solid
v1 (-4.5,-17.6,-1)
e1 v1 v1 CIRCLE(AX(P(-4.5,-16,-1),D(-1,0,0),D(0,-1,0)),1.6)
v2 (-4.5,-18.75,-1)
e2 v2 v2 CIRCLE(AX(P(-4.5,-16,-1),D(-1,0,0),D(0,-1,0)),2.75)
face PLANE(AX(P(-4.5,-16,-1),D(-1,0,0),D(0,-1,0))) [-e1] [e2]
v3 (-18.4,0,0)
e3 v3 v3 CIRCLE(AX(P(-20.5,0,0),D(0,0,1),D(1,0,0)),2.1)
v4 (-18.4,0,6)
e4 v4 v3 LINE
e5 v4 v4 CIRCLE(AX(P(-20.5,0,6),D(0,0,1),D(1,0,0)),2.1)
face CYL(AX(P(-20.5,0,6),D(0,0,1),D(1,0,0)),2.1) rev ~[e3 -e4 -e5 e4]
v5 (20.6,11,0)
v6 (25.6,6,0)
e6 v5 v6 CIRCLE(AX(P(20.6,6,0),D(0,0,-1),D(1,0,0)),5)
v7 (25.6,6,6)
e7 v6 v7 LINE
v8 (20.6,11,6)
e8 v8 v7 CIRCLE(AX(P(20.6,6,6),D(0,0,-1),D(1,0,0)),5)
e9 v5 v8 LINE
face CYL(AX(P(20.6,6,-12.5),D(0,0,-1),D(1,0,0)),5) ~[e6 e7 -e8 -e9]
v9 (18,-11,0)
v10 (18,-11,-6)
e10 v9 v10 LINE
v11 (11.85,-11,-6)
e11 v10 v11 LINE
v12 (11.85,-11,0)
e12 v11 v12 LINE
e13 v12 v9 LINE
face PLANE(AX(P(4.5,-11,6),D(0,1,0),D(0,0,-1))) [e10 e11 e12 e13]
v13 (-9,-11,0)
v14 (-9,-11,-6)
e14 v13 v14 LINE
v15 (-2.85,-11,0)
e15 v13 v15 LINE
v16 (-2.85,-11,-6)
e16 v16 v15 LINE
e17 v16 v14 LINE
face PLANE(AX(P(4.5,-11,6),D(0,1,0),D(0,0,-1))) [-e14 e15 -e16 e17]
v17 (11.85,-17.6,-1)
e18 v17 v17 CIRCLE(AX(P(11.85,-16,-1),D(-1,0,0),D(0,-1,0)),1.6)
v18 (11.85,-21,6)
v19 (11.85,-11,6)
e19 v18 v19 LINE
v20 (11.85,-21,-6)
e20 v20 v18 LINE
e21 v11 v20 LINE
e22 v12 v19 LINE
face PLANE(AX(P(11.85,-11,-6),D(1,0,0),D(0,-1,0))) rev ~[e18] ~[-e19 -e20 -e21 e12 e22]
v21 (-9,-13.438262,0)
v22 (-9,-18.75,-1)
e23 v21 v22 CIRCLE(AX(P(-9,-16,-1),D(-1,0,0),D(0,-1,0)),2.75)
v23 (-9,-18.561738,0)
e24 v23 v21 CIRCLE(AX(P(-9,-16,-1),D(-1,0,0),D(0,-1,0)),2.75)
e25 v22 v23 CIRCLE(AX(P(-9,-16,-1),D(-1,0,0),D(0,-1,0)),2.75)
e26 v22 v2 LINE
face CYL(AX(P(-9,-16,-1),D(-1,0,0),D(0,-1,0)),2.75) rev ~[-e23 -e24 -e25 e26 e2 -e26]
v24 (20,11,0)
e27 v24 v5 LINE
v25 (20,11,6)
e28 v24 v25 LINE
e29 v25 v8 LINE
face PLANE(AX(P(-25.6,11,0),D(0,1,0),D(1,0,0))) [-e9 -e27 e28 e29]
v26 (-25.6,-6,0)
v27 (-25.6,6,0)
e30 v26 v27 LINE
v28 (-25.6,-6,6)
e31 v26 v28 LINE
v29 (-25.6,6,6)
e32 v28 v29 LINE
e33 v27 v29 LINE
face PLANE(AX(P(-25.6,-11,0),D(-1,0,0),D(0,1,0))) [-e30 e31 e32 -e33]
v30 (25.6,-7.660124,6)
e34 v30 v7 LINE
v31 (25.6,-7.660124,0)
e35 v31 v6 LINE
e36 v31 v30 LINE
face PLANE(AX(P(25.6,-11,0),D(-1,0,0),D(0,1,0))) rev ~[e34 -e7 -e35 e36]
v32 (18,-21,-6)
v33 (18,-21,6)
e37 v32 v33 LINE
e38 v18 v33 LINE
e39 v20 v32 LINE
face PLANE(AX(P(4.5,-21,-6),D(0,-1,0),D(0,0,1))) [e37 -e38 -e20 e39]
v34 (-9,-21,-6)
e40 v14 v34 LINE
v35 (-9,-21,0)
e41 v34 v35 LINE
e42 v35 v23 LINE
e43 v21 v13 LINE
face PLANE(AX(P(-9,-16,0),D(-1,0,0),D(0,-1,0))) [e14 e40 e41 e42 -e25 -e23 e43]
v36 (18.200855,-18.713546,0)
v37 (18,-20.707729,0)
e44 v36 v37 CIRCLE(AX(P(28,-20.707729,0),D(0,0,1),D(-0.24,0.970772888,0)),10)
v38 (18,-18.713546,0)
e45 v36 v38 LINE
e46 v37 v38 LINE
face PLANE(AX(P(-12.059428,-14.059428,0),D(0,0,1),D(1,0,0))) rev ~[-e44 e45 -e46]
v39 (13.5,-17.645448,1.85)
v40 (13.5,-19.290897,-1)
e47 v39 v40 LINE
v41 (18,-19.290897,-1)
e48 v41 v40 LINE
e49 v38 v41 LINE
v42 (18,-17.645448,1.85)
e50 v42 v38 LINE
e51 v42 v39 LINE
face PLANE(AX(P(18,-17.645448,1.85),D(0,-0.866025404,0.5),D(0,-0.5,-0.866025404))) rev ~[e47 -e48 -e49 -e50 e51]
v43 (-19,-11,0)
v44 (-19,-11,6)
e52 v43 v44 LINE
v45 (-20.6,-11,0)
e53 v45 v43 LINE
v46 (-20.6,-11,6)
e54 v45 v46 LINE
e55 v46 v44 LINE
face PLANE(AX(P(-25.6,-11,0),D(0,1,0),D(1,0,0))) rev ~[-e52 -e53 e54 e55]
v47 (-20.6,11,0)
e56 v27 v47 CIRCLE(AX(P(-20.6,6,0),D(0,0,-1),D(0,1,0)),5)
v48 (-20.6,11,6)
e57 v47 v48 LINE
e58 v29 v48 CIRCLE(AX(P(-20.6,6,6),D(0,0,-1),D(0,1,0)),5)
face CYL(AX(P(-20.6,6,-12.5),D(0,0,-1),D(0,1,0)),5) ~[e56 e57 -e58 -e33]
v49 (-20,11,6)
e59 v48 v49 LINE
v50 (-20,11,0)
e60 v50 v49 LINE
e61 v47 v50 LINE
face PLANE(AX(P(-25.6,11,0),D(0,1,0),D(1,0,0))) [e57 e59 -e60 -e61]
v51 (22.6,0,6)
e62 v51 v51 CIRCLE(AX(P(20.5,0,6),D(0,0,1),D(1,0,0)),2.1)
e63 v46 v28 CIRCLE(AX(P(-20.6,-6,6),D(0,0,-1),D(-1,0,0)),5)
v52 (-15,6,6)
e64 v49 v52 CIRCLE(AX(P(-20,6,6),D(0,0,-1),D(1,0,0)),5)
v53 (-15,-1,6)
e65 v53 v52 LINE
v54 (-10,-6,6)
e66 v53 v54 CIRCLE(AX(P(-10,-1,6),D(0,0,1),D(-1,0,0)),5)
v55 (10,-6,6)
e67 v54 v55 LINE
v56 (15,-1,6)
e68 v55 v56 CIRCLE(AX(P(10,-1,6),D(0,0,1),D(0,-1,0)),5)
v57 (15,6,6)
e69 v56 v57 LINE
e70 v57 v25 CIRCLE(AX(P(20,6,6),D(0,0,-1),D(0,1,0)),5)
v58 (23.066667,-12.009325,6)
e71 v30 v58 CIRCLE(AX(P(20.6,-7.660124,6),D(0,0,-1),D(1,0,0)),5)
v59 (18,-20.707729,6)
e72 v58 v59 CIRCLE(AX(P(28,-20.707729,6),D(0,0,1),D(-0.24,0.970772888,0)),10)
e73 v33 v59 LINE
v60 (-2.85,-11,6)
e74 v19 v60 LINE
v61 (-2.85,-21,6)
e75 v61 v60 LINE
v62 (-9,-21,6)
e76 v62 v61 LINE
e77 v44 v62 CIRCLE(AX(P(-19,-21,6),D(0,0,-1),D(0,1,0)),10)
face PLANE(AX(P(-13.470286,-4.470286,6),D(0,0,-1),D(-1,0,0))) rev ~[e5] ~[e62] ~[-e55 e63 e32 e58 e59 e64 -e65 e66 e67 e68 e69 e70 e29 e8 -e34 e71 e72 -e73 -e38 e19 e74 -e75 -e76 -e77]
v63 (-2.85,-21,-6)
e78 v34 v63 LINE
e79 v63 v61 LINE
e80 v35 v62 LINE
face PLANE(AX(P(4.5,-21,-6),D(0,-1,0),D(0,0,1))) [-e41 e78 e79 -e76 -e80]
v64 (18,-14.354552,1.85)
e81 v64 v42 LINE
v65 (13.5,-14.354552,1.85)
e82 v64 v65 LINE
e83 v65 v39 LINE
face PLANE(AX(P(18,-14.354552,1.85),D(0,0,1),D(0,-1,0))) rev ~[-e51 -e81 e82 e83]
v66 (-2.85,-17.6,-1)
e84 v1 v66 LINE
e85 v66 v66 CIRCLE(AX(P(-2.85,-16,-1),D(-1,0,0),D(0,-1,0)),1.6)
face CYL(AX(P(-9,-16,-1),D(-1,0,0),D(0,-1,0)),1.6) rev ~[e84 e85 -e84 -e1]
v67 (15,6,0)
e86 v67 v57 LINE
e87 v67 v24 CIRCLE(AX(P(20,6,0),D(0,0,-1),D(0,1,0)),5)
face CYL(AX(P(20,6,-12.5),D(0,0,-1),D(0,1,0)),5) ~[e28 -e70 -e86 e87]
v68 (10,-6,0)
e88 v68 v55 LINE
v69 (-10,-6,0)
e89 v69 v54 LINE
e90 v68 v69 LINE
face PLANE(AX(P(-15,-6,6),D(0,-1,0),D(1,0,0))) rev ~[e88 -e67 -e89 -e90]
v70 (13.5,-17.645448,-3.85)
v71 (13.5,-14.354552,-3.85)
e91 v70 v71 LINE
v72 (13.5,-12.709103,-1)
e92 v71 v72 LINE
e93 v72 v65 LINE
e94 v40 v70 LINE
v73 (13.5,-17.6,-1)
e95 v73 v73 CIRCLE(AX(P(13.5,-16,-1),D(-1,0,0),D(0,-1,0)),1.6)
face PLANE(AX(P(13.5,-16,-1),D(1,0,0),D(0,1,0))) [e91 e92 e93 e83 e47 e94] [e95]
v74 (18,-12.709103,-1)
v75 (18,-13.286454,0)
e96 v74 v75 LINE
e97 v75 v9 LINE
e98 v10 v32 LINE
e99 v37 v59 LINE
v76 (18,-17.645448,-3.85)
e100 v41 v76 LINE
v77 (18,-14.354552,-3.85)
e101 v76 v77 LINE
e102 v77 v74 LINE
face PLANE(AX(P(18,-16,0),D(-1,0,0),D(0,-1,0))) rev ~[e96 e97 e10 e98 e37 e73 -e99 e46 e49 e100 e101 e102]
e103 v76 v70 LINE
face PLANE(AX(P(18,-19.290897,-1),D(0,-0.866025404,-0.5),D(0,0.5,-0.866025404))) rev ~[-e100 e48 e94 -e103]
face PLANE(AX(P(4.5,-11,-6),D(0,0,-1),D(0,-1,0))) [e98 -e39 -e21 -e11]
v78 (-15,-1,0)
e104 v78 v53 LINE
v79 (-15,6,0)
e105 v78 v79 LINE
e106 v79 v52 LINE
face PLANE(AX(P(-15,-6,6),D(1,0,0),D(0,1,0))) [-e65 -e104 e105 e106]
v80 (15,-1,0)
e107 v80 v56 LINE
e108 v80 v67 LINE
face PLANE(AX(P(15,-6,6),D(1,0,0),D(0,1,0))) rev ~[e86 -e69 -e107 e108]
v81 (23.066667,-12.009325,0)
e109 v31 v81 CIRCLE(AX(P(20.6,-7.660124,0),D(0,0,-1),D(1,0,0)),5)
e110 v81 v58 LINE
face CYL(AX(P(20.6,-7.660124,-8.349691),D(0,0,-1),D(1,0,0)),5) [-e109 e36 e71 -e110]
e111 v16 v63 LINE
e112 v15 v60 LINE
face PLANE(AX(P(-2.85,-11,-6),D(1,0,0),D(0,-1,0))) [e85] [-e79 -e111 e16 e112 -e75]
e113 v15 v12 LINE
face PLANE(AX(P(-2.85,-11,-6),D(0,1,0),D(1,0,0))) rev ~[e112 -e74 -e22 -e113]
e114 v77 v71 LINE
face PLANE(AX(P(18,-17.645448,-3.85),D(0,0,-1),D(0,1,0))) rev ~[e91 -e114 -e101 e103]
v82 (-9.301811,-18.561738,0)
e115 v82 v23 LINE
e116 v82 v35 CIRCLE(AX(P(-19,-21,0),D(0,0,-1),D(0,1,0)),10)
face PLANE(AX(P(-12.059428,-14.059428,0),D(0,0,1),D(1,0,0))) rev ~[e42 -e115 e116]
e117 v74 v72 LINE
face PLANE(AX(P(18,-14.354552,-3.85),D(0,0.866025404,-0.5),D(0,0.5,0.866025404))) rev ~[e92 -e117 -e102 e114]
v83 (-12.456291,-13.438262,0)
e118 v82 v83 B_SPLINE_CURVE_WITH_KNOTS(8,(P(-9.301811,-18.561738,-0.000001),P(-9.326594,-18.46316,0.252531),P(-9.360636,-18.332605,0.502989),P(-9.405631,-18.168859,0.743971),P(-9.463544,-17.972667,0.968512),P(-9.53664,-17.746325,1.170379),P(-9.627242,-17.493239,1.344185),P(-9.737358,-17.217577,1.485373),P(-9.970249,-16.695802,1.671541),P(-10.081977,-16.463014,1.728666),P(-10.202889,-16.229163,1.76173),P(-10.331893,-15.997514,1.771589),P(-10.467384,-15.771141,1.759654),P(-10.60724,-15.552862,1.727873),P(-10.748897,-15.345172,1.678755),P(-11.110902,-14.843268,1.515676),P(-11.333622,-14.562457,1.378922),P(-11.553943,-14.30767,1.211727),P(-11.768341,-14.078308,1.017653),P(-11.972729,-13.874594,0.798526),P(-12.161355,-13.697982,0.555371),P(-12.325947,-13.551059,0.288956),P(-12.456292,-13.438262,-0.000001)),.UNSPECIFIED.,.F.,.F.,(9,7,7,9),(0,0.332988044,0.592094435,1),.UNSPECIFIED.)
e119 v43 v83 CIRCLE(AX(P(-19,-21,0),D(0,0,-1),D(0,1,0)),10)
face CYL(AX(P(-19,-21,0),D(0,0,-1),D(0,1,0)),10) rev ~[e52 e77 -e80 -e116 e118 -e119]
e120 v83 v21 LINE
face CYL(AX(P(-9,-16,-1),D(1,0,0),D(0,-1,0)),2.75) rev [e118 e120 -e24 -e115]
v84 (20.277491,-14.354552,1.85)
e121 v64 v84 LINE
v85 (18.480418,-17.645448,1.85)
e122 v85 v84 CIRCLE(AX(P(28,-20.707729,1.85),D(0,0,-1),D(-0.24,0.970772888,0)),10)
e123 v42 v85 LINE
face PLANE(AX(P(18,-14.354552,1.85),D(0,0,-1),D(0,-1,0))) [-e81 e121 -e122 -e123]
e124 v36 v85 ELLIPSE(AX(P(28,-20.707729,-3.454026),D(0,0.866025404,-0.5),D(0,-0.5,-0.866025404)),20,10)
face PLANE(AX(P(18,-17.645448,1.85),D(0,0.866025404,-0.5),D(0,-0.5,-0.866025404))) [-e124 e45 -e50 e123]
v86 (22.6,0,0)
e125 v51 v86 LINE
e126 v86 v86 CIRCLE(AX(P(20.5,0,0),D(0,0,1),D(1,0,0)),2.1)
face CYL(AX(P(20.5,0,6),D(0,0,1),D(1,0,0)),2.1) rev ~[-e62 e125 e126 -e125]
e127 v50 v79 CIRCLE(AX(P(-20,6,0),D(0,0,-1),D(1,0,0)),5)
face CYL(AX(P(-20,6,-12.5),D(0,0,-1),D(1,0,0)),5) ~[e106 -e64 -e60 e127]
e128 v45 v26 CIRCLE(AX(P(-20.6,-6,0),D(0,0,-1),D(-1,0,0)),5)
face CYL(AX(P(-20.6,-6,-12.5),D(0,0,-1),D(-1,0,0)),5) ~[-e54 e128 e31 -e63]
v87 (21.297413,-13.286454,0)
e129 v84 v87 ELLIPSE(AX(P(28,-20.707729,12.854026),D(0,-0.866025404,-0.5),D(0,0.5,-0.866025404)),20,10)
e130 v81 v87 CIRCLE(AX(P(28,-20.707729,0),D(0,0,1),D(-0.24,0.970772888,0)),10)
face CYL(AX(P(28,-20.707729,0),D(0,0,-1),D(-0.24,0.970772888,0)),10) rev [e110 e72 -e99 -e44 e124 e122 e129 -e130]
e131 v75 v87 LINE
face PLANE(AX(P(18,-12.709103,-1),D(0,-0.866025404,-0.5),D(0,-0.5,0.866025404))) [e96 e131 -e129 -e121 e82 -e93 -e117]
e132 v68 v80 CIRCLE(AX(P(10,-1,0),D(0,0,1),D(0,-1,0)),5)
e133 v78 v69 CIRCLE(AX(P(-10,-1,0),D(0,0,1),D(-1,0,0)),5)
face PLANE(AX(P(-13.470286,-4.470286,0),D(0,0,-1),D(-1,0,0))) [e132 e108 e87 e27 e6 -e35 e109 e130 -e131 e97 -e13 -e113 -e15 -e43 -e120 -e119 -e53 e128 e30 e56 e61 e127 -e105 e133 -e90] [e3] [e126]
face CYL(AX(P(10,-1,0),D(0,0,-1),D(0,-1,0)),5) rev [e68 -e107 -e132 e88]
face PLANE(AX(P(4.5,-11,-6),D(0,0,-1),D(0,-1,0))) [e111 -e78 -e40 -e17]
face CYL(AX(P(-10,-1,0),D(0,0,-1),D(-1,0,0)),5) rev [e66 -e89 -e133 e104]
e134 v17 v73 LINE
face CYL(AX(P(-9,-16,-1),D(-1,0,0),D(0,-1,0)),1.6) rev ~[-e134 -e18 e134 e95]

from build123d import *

# Parameters (mm, degrees)
F0_W           = 51.2
F0_H           = 22
F1_DEPTH       = 6
F2_R           = 2.1
F3_DEPTH       = 6.001
F5_DEPTH       = 6.001
F8_DEPTH       = 13.5
F9_W           = 14.7
F9_H           = 10
F10_DEPTH      = 12.001
F11_T1_DEPTH   = 6
F12_R          = 1.6
F13_DEPTH      = 34.601
F13_DEPTH_BACK = 16.601
F14_R          = 2.75
F15_DEPTH      = 4.5
F15_DEPTH_BACK = 16.601
F17_DEPTH      = 4.5
F17_DEPTH_BACK = 25
F18_W          = 30
F18_H          = 17
F19_DEPTH      = 12.001
F20_T1_DEPTH   = 6
F20_T3_DEPTH   = 31
F20_T5_DEPTH   = 22.6993813232


# Not quite as in the source:
# - a fillet or chamfer that OpenCascade refuses, or shapes differently, is made with other operations: its cross-section is extruded or revolved along the edge and cut away or added


with BuildPart() as f1:
    # F0 (on Top) → F1 (new body)
    with BuildSketch(Plane.XY):
        Rectangle(F0_W, F0_H)
    extrude(amount=F1_DEPTH)

    # F2 (on face) → F3 (cut, through all)
    with BuildSketch(Plane.XY.offset(6)):
        with Locations((-20.5, 0)):
            Circle(F2_R)
        with Locations((20.5, 0)):
            Circle(F2_R)
    extrude(amount=-F3_DEPTH, mode=Mode.SUBTRACT)

    # F4 (on face) → F5 (cut, through all)
    with BuildSketch(Plane.XY.offset(6)):
        with BuildLine():
            Line((-1.5, 11), (-1.5, 0))
            ThreePointArc((-1.5, 0), (4.5, -6), (10.5, 0))
            Line((10.5, 0), (10.5, 11))
            Line((10.5, 11), (-1.5, 11))
        make_face()
    extrude(amount=-F5_DEPTH, mode=Mode.SUBTRACT)

    # F7 (on mid) → F8 (join, symmetric)
    with BuildSketch(Plane(origin=(4.5, 0, 0), x_dir=(0, -1, 0), z_dir=(-1, 0, 0))):
        Polygon((21, 6), (11, 6), (11, 0), (11, -6), (21, -6), align=None)
    extrude(amount=F8_DEPTH, both=True)

    # F9 (on face) → F10 (cut, through all)
    with BuildSketch(Plane(origin=(0, 0, -6), x_dir=(1, 0, 0), z_dir=(0, 0, -1))):
        with Locations((4.5, 16)):
            Rectangle(F9_W, F9_H)
    extrude(amount=-F10_DEPTH, mode=Mode.SUBTRACT)

    # F11: fillet of radius 10 on 2 edges, made by hand

    # F11_s2 → F11_t1 (join)
    with BuildSketch(Plane.XY):
        with BuildLine():
            ThreePointArc((-19, -11), (-11.9289321881, -13.9289321881), (-9, -21))
            Line((-9, -21), (-9, -11))
            Line((-9, -11), (-19, -11))
        make_face()
        with BuildLine():
            ThreePointArc((25.6, -11), (20.125992126, -14.5433148766), (18, -20.7077288796))
            Line((18, -20.7077288796), (18, -11))
            Line((18, -11), (25.6, -11))
        make_face()
    extrude(amount=F11_T1_DEPTH)

    # F12 (on face) → F13 (cut, two sides)
    with BuildSketch(Plane(origin=(-9, 0, 0), x_dir=(0, -1, 0), z_dir=(-1, 0, 0))) as f13_sk:
        with Locations((16, -1)):
            Circle(F12_R)
    extrude(amount=-F13_DEPTH, mode=Mode.SUBTRACT)
    extrude(f13_sk.sketch, amount=F13_DEPTH_BACK, mode=Mode.SUBTRACT)

    # F14 (on face) → F15 (cut, two sides)
    with BuildSketch(Plane(origin=(-9, 0, 0), x_dir=(0, -1, 0), z_dir=(-1, 0, 0))) as f15_sk:
        with Locations((16, -1)):
            Circle(F14_R)
    extrude(amount=-F15_DEPTH, mode=Mode.SUBTRACT)
    extrude(f15_sk.sketch, amount=F15_DEPTH_BACK, mode=Mode.SUBTRACT)

    # F16 (on face) → F17 (cut, two sides)
    with BuildSketch(Plane.YZ.offset(18)) as f17_sk:
        Polygon((-14.3545517328, -3.85), (-12.7091034656, -1), (-14.3545517328, 1.85), (-17.6454482672, 1.85), (-19.2908965344, -1), (-17.6454482672, -3.85), align=None)
    extrude(amount=-F17_DEPTH, mode=Mode.SUBTRACT)
    extrude(f17_sk.sketch, amount=F17_DEPTH_BACK, mode=Mode.SUBTRACT)

    # F18 (on face) → F19 (cut, through all)
    with BuildSketch(Plane.XY.offset(6)):
        with Locations((0, 2.5)):
            Rectangle(F18_W, F18_H)
    extrude(amount=-F19_DEPTH, mode=Mode.SUBTRACT)

    # F20: fillet of radius 5 on 9 edges, made by hand

    # F20_s2 → F20_t1 (join)
    with BuildSketch(Plane.XY):
        with BuildLine():
            ThreePointArc((-15, -1), (-13.5355339059, -4.5355339059), (-10, -6))
            Line((-10, -6), (-15, -6))
            Line((-15, -6), (-15, -1))
        make_face()
        with BuildLine():
            ThreePointArc((10, -6), (13.5355339059, -4.5355339059), (15, -1))
            Line((15, -1), (15, -6))
            Line((15, -6), (10, -6))
        make_face()
    extrude(amount=F20_T1_DEPTH)

    # F20_s4 → F20_t3 (cut)
    with BuildSketch(Plane.XY.offset(-12.5)):
        with BuildLine():
            ThreePointArc((-25.6, -6), (-24.1355339059, -9.5355339059), (-20.6, -11))
            Line((-20.6, -11), (-25.6, -11))
            Line((-25.6, -11), (-25.6, -6))
        make_face()
        with BuildLine():
            ThreePointArc((25.6, 6), (24.1355339059, 9.5355339059), (20.6, 11))
            Line((20.6, 11), (25.6, 11))
            Line((25.6, 11), (25.6, 6))
        make_face()
        with BuildLine():
            ThreePointArc((20, 11), (16.4644660941, 9.5355339059), (15, 6))
            Line((15, 6), (15, 11))
            Line((15, 11), (20, 11))
        make_face()
        with BuildLine():
            ThreePointArc((-20.6, 11), (-24.1355339059, 9.5355339059), (-25.6, 6))
            Line((-25.6, 6), (-25.6, 11))
            Line((-25.6, 11), (-20.6, 11))
        make_face()
        with BuildLine():
            ThreePointArc((-15, 6), (-16.4644660941, 9.5355339059), (-20, 11))
            Line((-20, 11), (-15, 11))
            Line((-15, 11), (-15, 6))
        make_face()
    extrude(amount=F20_T3_DEPTH, mode=Mode.SUBTRACT)

    # F20_s6 → F20_t5 (cut)
    with BuildSketch(Plane.XY.offset(-8.3496906616)):
        with BuildLine():
            ThreePointArc((25.6, -7.6601237354), (24.9204937989, -10.1767352138), (23.0666666667, -12.0093254501))
            ThreePointArc((23.0666666667, -12.0093254501), (24.298766569, -11.4179026654), (25.6, -11))
            Line((25.6, -11), (25.6, -7.6601237354))
        make_face()
    extrude(amount=F20_T5_DEPTH, mode=Mode.SUBTRACT)


solid = f1.part
